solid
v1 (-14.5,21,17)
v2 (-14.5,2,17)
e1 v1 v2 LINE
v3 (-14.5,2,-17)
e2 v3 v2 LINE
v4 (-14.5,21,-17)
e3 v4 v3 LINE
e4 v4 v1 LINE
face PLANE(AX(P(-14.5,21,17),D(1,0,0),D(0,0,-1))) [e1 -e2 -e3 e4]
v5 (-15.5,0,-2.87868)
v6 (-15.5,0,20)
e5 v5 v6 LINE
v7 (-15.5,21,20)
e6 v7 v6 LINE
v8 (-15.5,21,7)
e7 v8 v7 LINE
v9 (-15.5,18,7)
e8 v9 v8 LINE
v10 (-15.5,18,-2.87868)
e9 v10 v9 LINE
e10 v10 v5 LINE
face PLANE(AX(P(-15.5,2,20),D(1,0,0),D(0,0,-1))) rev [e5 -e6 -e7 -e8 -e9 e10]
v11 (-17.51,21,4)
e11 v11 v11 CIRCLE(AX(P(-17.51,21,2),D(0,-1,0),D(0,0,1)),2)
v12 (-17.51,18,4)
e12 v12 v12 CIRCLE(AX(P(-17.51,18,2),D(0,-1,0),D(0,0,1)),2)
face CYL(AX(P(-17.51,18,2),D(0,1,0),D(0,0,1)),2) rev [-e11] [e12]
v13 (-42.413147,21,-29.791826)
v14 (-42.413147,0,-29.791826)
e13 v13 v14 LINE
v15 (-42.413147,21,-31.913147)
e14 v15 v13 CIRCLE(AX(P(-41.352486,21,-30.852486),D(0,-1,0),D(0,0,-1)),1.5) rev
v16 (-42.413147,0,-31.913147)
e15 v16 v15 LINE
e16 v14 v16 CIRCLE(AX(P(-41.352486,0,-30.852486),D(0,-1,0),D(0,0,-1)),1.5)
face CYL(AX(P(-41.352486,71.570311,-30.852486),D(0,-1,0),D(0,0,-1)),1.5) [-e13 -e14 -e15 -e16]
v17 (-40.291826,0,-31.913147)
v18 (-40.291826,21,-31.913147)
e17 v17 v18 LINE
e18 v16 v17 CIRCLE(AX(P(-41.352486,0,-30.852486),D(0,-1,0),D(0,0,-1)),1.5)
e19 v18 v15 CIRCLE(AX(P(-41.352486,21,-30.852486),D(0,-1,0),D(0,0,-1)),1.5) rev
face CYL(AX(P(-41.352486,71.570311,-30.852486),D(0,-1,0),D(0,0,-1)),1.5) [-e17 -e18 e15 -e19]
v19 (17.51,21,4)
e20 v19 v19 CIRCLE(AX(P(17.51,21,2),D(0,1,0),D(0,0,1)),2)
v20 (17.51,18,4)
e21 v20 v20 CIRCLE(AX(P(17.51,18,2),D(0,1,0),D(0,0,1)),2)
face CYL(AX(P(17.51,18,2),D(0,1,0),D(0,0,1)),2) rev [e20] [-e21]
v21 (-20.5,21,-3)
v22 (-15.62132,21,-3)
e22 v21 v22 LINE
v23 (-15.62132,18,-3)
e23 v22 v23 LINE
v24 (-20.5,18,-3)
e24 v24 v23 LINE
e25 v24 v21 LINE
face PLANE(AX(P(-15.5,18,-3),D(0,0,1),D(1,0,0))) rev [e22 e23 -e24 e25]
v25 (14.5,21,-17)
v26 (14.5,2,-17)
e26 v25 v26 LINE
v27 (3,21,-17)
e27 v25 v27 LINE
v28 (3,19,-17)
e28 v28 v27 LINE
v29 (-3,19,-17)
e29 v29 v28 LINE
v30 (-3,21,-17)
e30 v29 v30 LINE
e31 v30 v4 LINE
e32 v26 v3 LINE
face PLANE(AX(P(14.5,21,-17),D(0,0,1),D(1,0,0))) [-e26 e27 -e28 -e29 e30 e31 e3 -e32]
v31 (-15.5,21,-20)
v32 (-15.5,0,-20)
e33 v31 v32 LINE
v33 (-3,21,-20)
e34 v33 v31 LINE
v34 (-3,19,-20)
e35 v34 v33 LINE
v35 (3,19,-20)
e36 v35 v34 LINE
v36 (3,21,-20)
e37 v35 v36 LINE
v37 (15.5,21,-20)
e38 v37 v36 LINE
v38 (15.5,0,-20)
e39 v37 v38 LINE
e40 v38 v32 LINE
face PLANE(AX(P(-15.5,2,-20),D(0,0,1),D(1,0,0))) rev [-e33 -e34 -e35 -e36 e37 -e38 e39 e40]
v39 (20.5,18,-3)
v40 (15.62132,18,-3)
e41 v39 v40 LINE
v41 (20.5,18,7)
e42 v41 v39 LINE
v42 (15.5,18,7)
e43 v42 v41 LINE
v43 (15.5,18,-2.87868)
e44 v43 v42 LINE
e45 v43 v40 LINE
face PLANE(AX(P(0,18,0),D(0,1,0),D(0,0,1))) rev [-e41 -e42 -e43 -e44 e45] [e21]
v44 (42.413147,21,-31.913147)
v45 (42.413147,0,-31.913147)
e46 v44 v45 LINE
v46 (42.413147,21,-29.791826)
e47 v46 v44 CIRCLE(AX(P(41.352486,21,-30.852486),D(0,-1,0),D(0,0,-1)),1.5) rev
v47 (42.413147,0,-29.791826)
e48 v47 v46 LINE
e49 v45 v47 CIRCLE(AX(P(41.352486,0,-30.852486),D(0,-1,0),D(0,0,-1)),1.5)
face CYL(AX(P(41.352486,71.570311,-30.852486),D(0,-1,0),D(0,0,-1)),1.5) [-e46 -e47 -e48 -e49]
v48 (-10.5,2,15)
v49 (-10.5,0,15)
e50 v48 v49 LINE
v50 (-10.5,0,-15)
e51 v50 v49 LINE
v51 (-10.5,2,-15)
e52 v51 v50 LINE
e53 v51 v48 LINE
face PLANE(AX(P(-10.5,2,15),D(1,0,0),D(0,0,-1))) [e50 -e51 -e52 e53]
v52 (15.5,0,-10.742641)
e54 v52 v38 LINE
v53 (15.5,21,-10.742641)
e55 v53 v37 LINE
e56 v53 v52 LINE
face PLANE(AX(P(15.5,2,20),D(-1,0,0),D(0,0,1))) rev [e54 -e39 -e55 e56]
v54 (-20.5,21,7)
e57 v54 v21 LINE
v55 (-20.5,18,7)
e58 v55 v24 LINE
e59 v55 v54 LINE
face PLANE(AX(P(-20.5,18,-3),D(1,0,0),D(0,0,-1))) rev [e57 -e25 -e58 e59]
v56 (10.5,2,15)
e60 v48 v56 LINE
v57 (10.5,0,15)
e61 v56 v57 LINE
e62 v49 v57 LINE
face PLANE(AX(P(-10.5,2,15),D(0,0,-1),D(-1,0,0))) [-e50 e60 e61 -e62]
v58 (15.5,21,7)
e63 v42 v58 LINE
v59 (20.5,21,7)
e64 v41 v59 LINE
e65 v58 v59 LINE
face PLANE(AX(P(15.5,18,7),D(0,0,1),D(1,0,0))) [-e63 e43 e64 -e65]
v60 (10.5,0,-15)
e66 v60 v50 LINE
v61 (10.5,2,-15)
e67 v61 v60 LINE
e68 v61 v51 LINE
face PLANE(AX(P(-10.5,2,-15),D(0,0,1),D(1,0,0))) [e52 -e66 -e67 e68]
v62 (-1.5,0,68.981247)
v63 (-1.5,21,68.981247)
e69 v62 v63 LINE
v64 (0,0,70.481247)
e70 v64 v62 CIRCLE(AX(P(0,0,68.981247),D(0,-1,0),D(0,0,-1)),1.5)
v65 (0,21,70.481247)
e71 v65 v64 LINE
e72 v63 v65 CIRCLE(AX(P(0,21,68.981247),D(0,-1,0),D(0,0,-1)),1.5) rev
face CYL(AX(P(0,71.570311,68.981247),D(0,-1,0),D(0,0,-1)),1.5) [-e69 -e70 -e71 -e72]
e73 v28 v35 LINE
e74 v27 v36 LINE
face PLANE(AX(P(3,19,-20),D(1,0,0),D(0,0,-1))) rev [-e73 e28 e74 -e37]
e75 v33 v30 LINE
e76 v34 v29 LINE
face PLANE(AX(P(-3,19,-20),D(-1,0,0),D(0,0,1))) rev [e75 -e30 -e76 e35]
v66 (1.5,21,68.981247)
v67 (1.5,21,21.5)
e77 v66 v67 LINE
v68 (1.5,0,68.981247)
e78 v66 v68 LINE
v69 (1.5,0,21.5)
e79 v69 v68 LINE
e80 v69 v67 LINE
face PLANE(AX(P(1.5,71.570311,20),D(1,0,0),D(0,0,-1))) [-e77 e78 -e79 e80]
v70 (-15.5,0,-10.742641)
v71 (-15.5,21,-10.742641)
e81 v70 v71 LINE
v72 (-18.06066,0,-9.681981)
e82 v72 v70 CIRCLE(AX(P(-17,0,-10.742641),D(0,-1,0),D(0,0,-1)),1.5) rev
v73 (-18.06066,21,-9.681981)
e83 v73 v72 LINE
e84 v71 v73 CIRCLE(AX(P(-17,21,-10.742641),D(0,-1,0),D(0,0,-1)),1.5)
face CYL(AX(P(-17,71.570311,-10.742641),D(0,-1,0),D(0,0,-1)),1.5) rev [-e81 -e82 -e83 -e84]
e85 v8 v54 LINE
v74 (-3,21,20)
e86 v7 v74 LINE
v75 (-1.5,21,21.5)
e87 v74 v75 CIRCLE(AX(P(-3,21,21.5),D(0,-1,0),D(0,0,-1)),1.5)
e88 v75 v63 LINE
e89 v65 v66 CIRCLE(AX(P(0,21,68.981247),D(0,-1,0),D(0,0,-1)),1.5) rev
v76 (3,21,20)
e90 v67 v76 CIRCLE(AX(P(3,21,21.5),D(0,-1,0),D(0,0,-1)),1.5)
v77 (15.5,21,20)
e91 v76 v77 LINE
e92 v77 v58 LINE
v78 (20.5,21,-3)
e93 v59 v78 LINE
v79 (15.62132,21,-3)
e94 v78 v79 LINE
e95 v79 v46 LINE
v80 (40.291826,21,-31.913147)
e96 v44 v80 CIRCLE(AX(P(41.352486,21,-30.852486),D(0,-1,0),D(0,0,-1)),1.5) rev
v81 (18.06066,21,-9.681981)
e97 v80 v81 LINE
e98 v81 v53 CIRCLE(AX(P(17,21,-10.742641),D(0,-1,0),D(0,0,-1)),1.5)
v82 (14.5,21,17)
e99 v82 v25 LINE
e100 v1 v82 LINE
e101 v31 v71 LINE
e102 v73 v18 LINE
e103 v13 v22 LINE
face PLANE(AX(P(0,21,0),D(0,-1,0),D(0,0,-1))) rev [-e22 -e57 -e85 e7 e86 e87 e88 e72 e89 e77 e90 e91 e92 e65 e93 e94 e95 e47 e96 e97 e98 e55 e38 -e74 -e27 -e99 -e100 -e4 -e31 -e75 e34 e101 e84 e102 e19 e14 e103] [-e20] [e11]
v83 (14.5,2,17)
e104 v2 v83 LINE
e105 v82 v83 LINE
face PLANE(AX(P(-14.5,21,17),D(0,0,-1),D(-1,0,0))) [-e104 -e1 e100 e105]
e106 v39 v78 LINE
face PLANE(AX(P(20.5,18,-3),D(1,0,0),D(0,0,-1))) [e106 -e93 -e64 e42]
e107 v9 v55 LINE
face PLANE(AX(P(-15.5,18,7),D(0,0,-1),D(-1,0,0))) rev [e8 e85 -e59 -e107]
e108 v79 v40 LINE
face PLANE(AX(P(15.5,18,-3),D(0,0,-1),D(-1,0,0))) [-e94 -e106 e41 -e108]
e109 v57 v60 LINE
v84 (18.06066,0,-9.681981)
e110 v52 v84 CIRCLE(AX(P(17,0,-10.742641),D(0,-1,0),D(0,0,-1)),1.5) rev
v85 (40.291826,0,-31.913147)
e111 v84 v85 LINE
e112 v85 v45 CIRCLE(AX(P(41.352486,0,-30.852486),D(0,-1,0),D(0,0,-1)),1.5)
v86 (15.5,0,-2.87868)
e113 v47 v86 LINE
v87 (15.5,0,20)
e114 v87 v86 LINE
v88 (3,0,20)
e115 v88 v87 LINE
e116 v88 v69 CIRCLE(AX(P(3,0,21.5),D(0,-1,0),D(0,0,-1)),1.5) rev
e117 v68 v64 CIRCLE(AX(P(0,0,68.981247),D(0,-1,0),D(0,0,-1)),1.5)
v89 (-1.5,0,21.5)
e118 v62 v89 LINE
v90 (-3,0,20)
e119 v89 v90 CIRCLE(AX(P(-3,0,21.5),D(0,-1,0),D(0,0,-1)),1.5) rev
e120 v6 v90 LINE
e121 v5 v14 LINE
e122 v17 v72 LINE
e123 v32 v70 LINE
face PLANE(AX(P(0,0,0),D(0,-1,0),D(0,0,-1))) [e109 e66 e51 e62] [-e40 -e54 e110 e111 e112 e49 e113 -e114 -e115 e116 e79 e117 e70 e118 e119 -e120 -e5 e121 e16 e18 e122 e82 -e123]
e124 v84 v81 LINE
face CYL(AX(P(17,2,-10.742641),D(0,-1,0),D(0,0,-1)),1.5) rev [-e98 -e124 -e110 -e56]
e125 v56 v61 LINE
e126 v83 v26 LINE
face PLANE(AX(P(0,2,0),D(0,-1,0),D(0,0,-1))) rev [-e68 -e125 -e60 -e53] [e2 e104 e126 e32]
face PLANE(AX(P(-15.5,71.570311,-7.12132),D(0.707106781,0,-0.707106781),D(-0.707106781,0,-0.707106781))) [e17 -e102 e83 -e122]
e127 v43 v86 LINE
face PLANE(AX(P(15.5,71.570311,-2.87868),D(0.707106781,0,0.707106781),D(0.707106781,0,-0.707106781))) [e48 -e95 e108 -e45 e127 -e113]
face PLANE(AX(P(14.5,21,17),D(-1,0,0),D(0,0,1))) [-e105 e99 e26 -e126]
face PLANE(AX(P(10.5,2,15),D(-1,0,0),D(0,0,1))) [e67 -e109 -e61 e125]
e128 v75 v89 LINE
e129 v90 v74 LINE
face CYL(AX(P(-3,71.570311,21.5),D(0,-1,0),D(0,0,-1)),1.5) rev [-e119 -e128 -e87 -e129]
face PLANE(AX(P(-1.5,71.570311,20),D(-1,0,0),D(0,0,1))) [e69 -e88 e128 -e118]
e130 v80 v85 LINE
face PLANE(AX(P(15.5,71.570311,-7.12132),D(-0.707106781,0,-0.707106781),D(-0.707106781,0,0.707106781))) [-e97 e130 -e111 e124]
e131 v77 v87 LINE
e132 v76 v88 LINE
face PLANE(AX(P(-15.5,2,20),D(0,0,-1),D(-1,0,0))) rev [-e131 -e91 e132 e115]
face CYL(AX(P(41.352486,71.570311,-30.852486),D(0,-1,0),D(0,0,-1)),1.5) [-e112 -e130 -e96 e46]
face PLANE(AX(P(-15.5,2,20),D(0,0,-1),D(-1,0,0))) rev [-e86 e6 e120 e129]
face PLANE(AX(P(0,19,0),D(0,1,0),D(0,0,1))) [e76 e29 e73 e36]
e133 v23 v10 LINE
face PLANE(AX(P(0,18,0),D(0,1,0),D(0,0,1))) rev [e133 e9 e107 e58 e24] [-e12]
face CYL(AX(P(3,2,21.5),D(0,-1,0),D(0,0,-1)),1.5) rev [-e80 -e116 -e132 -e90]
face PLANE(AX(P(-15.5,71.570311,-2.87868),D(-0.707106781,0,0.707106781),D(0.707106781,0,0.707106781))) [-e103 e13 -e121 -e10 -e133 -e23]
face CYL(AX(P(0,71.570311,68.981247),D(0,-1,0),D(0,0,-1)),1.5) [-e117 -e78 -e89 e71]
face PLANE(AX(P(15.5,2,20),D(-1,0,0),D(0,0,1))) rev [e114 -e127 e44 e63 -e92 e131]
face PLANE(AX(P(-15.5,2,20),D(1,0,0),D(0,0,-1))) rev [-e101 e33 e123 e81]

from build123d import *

# Parameters (mm, degrees)
SKETCH1_W           = 31
SKETCH1_H           = 40
SKETCH1_W_2         = 21
SKETCH1_H_2         = 30
BOSS_EXTRUDE1_DEPTH = 2
SKETCH2_W           = 31
SKETCH2_H           = 40
SKETCH2_W_2         = 29
SKETCH2_H_2         = 34
BOSS_EXTRUDE2_DEPTH = 19
SKETCH4_W           = 5
SKETCH4_H           = 10
SKETCH4_R           = 2
BOSS_EXTRUDE3_DEPTH = 3
BOSS_EXTRUDE4_START = -21
SKETCH5_W           = 3
SKETCH5_H           = 50.481247069
BOSS_EXTRUDE4_DEPTH = 21
FILLET2_R           = 1.5
SKETCH7_W           = 6
SKETCH7_H           = 3
CUT_EXTRUDE4_DEPTH  = 2


with BuildPart() as part:
    # Sketch1 → Boss-Extrude1 (new body)
    with BuildSketch(Plane(origin=(0, 0, 0), x_dir=(1, 0, 0), z_dir=(0, 1, 0))):
        Rectangle(SKETCH1_W, SKETCH1_H)
        Rectangle(SKETCH1_W_2, SKETCH1_H_2, mode=Mode.SUBTRACT)
    extrude(amount=BOSS_EXTRUDE1_DEPTH)

    # Sketch2 → Boss-Extrude2 (add)
    with BuildSketch(Plane(origin=(0, 2, 0), x_dir=(1, 0, 0), z_dir=(0, 1, 0))):
        Rectangle(SKETCH2_W, SKETCH2_H)
        Rectangle(SKETCH2_W_2, SKETCH2_H_2, mode=Mode.SUBTRACT)
    extrude(amount=BOSS_EXTRUDE2_DEPTH)

    # Sketch4 → Boss-Extrude3 (add)
    with BuildSketch(Plane(origin=(0, 21, 0), x_dir=(1, 0, 0), z_dir=(0, 1, 0))):
        with Locations((18, -2)):
            Rectangle(SKETCH4_W, SKETCH4_H)
        with Locations(Location((17.51, -2, 0), (0, 0, 270))):
            Circle(SKETCH4_R, mode=Mode.SUBTRACT)
    boss_extrude3 = extrude(amount=-BOSS_EXTRUDE3_DEPTH)

    # Mirror1: Boss-Extrude3 across plane
    add(boss_extrude3.mirror(Plane(origin=(0, 0, 0), x_dir=(0, 0, 1), z_dir=(1, 0, 0))))

    # Sketch5 → Boss-Extrude4 (add)
    with BuildSketch(Plane.XZ.offset(BOSS_EXTRUDE4_START)):
        with Locations((0, 45.240623535)):
            Rectangle(SKETCH5_W, SKETCH5_H)
        Polygon((-41.352486375, -32.973806719), (-43.473806719, -30.852486375), (-15.5, -2.878679656), (-15.5, -7.121320344), align=None)
        Polygon((15.5, -2.878679656), (43.473806719, -30.852486375), (41.352486375, -32.973806719), (15.5, -7.121320344), align=None)
    extrude(amount=BOSS_EXTRUDE4_DEPTH)

    # Fillet2
    fillet2_edges = [part.edges().sort_by_distance(p)[0] for p in [
        (-41.352486375, 10.5, -32.973806719),
        (-43.473806719, 10.5, -30.852486375),
        (41.352486375, 10.5, -32.973806719),
        (43.473806719, 10.5, -30.852486375),
        (1.5, 10.5, 70.481247069),
        (-1.5, 10.5, 70.481247069),
        (1.5, 10.5, 20),
        (-1.5, 10.5, 20),
        (-15.5, 10.5, -7.121320344),
        (15.5, 10.5, -7.121320344),
    ]]
    fillet(fillet2_edges, radius=FILLET2_R - 0.0001)  # a hair under: the kernel refuses the full size

    # Sketch7 → Cut-Extrude4 (cut)
    with BuildSketch(Plane(origin=(0, 21, 0), x_dir=(1, 0, 0), z_dir=(0, 1, 0))):
        with Locations((0, 18.5)):
            Rectangle(SKETCH7_W, SKETCH7_H)
    extrude(amount=-CUT_EXTRUDE4_DEPTH, mode=Mode.SUBTRACT)


solid = part.part
